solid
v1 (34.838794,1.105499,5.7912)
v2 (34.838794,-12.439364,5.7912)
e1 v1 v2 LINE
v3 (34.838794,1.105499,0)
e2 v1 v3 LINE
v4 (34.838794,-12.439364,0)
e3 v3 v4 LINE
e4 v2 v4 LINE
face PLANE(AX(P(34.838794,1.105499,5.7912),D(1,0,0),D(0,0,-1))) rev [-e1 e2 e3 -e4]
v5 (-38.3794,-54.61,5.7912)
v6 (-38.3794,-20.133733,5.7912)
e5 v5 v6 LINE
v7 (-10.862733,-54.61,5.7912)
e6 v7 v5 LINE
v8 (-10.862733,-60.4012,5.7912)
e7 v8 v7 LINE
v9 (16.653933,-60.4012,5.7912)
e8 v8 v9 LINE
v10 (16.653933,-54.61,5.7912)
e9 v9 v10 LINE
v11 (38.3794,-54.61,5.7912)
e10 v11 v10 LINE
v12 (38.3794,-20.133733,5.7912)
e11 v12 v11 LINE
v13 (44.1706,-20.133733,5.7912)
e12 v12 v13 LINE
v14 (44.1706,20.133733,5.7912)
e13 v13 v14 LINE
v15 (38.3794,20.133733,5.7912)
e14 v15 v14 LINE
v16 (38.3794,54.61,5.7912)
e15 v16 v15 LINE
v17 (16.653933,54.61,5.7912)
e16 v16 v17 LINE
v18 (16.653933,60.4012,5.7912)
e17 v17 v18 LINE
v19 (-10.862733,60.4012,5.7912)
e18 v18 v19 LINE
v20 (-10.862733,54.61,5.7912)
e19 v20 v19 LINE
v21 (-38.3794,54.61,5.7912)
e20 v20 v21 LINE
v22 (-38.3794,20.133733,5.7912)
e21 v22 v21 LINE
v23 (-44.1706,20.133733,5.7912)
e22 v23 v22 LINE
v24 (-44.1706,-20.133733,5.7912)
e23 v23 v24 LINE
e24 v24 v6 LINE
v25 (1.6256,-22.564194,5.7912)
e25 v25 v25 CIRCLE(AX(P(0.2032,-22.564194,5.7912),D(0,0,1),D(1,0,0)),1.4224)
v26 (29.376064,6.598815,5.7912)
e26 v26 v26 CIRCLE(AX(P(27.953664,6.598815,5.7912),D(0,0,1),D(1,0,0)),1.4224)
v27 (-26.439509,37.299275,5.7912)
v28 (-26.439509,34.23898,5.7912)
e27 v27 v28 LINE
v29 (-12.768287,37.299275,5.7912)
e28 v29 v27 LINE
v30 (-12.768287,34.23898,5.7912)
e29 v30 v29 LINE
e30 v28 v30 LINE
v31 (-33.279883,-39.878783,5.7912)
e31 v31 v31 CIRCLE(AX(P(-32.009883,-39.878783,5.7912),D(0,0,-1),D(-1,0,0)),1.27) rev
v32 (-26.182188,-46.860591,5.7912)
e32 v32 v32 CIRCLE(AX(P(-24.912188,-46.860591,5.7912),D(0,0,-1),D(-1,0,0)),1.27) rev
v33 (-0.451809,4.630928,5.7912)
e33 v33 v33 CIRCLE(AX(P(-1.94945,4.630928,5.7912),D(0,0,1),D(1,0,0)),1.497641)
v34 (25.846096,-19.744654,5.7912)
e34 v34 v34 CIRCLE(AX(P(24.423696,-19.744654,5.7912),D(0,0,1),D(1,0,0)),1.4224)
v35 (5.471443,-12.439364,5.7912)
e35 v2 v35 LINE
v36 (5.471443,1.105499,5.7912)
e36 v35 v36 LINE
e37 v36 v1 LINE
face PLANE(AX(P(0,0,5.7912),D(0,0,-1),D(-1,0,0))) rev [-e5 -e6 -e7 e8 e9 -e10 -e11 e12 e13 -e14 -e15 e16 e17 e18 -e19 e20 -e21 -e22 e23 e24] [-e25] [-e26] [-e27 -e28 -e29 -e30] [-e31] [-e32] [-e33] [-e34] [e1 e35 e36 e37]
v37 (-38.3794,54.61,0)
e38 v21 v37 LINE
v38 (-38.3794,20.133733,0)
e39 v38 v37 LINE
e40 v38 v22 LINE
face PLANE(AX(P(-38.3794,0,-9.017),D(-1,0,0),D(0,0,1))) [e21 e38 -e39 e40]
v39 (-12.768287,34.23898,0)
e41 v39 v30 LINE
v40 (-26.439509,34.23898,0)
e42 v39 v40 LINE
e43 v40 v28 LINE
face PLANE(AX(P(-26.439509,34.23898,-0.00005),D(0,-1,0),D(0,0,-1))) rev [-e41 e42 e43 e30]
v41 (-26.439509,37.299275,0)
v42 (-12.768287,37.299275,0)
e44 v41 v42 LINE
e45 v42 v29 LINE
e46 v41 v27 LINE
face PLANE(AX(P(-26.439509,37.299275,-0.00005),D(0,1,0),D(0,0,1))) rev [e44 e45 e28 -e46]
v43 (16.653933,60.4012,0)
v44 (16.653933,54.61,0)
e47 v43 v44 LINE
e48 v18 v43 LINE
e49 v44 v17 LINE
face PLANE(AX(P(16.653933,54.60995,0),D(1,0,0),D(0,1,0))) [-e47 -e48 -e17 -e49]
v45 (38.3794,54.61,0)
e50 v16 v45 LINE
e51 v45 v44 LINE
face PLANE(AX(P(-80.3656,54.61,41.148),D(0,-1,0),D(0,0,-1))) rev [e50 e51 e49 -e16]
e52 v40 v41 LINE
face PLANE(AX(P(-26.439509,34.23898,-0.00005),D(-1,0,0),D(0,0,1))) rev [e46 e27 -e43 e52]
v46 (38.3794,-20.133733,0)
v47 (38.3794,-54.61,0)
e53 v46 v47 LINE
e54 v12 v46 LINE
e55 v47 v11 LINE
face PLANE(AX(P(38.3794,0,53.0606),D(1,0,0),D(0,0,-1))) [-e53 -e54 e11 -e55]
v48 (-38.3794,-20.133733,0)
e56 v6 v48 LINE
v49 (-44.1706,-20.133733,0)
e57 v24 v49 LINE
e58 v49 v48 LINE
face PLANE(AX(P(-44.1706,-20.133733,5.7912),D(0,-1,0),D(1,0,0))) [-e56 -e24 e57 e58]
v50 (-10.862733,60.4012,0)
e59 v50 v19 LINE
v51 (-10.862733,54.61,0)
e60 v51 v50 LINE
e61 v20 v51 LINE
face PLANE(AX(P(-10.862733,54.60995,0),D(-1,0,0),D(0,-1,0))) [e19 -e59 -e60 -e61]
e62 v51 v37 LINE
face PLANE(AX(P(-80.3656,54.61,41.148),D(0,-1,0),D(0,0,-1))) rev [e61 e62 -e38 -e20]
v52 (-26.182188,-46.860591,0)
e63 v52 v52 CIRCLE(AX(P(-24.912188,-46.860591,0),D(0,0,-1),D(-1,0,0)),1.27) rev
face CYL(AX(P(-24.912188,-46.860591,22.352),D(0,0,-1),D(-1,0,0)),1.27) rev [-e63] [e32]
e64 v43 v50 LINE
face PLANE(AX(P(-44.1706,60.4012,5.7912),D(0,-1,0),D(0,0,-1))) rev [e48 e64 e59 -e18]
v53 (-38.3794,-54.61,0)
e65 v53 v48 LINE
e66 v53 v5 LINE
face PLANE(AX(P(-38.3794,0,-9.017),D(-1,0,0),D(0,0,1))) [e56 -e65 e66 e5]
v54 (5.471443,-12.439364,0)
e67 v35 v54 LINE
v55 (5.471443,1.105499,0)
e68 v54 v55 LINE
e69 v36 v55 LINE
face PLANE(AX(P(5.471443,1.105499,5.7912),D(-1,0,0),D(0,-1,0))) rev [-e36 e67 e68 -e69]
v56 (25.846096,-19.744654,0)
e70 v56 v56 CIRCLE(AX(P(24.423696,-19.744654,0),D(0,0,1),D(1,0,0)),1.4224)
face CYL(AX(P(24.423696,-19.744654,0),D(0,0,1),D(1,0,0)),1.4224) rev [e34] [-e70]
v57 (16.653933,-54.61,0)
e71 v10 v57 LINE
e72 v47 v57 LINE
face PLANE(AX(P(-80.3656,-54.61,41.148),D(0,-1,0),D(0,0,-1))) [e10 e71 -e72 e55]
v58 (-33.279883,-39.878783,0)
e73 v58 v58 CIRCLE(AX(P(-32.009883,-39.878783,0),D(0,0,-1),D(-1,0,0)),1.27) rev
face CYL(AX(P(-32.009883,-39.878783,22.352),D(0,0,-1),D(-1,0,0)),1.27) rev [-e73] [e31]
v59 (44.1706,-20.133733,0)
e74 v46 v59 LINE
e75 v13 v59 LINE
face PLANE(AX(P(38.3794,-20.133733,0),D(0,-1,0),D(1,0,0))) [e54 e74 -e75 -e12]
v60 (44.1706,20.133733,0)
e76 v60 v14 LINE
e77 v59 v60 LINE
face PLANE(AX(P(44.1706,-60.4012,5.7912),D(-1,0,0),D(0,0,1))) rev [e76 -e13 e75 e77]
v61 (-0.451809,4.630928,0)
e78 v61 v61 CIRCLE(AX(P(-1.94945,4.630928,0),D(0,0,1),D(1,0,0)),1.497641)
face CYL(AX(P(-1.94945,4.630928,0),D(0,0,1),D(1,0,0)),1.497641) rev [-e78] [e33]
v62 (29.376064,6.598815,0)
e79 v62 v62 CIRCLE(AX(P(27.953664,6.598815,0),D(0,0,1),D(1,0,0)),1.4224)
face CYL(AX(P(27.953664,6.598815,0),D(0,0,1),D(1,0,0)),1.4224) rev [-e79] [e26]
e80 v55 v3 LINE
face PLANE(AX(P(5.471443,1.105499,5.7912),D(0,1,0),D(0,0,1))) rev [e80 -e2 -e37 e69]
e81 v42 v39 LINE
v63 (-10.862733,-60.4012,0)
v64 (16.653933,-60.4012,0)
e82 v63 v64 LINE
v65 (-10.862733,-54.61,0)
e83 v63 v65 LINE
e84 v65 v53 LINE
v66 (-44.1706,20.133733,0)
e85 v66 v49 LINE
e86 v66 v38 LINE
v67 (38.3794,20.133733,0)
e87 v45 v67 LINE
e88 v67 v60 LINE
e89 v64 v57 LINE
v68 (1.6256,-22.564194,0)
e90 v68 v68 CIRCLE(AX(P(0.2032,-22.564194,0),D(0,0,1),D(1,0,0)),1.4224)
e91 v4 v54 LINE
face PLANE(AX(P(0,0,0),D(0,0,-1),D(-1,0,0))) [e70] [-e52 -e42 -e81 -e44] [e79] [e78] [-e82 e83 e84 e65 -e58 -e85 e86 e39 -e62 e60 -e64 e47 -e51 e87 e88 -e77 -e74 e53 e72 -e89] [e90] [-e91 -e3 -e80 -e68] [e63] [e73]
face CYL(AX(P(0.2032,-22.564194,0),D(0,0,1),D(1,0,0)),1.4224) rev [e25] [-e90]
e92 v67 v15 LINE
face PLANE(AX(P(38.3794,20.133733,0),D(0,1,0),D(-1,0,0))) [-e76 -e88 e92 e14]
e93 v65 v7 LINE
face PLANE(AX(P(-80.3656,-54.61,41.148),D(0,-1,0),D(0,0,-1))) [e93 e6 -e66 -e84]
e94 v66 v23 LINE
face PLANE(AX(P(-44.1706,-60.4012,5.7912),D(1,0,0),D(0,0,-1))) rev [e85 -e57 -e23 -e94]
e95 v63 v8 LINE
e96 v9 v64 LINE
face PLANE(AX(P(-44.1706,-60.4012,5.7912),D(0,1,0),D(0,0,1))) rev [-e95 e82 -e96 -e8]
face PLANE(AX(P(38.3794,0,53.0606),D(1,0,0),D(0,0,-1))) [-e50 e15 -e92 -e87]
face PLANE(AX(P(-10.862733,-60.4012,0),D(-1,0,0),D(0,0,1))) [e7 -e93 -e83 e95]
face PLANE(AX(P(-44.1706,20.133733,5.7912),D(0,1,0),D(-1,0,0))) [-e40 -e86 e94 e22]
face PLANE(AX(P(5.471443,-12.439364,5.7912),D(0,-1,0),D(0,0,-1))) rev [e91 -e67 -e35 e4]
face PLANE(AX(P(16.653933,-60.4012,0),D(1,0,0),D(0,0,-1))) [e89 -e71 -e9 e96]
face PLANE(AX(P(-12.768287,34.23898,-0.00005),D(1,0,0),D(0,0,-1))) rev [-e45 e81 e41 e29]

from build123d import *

# Parameters (mm, degrees)
SKETCH1_W                = 88.3412
SKETCH1_H                = 120.8024
BOSS_EXTRUDE1_DEPTH      = 5.7912
SKETCH6_R                = 1.4224
SKETCH6_R_2              = 1.497641053
CUT_EXTRUDE5_DEPTH       = 76.052547347
SKETCH7_W                = 29.367351422
SKETCH7_H                = 13.544863044
CUT_EXTRUDE6_DEPTH       = 76.052547347
CAVITY1_START            = -60.4012
CAVITY1_OUTLINE_W        = 5.7912
CAVITY1_OUTLINE_H        = 5.7912
CAVITY1_DEPTH            = 40.267466667
CAVITY1_START_2          = 20.133733333
CAVITY1_2_OUTLINE_W      = 5.7912
CAVITY1_2_OUTLINE_H      = 5.7912
CAVITY1_2_DEPTH          = 40.267466667
CAVITY1_3_OUTLINE_W      = 21.725466667
CAVITY1_3_OUTLINE_H      = 5.7912
CAVITY1_3_OUTLINE_W_2    = 27.516666667
CAVITY1_3_DEPTH          = 5.7912
CAVITY1_START_3          = 54.61
CAVITY1_4_OUTLINE_W      = 21.725466667
CAVITY1_4_OUTLINE_H      = 5.7912
CAVITY1_4_OUTLINE_W_2    = 27.516666667
CAVITY1_4_DEPTH          = 5.7912
CUT_EXTRUDE13_DEPTH      = 22.352
CUT_EXTRUDE13_DEPTH_BACK = 32.512
SKETCH8_R                = 1.27
SKETCH9_W                = 13.671222204
SKETCH9_H                = 3.060294153
CUT_EXTRUDE14_DEPTH      = 76.052547347


# Read off the part's stored shape, not the designer's step: Cavity1
with BuildPart() as part:
    # Sketch1 → Boss-Extrude1 (new body)
    with BuildSketch(Plane.XY):
        Rectangle(SKETCH1_W, SKETCH1_H)
    extrude(amount=BOSS_EXTRUDE1_DEPTH)

    # Sketch6 → Cut-Extrude5 (cut, through all)
    with BuildSketch(Plane.XY.offset(5.7912)):
        with Locations((0.2032, -22.564194219)):
            Circle(SKETCH6_R)
        with Locations((24.423695828, -19.744653869)):
            Circle(SKETCH6_R)
        with Locations((-1.949450117, 4.630928051)):
            Circle(SKETCH6_R_2)
        with Locations((27.953664088, 6.598815085)):
            Circle(SKETCH6_R)
    extrude(amount=-CUT_EXTRUDE5_DEPTH, mode=Mode.SUBTRACT)

    # Sketch7 → Cut-Extrude6 (cut, through all)
    with BuildSketch(Plane(origin=(0, 0, 0), x_dir=(-1, 0, 0), z_dir=(0, 0, -1))):
        with Locations((-20.155118324, -5.666932702)):
            Rectangle(SKETCH7_W, SKETCH7_H)
    extrude(amount=-CUT_EXTRUDE6_DEPTH, mode=Mode.SUBTRACT)

    # Cavity1 outline → Cavity1 (cut)
    with BuildSketch(Plane(origin=(0, 0, 0), x_dir=(1, 0, 0), z_dir=(0, 1, 0)).offset(CAVITY1_START)):
        with Locations((41.275, -2.8956)):
            Rectangle(CAVITY1_OUTLINE_W, CAVITY1_OUTLINE_H)
        with Locations((-41.275, -2.8956)):
            Rectangle(CAVITY1_OUTLINE_W, CAVITY1_OUTLINE_H)
    extrude(amount=CAVITY1_DEPTH, mode=Mode.SUBTRACT)

    # Cavity1 2 outline → Cavity1 2 (cut)
    with BuildSketch(Plane(origin=(0, 0, 0), x_dir=(1, 0, 0), z_dir=(0, 1, 0)).offset(CAVITY1_START_2)):
        with Locations((41.275, -2.8956)):
            Rectangle(CAVITY1_2_OUTLINE_W, CAVITY1_2_OUTLINE_H)
        with Locations((-41.275, -2.8956)):
            Rectangle(CAVITY1_2_OUTLINE_W, CAVITY1_2_OUTLINE_H)
    extrude(amount=CAVITY1_2_DEPTH, mode=Mode.SUBTRACT)

    # Cavity1 3 outline → Cavity1 3 (cut)
    with BuildSketch(Plane(origin=(0, 0, 0), x_dir=(1, 0, 0), z_dir=(0, 1, 0)).offset(CAVITY1_START)):
        with Locations((27.516666667, -2.8956)):
            Rectangle(CAVITY1_3_OUTLINE_W, CAVITY1_3_OUTLINE_H)
        with Locations((-24.621066667, -2.8956)):
            Rectangle(CAVITY1_3_OUTLINE_W_2, CAVITY1_3_OUTLINE_H)
    extrude(amount=CAVITY1_3_DEPTH, mode=Mode.SUBTRACT)

    # Cavity1 4 outline → Cavity1 4 (cut)
    with BuildSketch(Plane(origin=(0, 0, 0), x_dir=(1, 0, 0), z_dir=(0, 1, 0)).offset(CAVITY1_START_3)):
        with Locations((27.516666667, -2.8956)):
            Rectangle(CAVITY1_4_OUTLINE_W, CAVITY1_4_OUTLINE_H)
        with Locations((-24.621066667, -2.8956)):
            Rectangle(CAVITY1_4_OUTLINE_W_2, CAVITY1_4_OUTLINE_H)
    extrude(amount=CAVITY1_4_DEPTH, mode=Mode.SUBTRACT)

    # Sketch8 → Cut-Extrude13 (cut, two sides: drawn at the far end of the back side and taken through both)
    with BuildSketch(Plane.XY.offset(-CUT_EXTRUDE13_DEPTH_BACK)):
        with Locations(Location((-24.91218753, -46.860591388, 0), (0, 0, 180))):
            Circle(SKETCH8_R)
        with Locations(Location((-32.009882617, -39.878782893, 0), (0, 0, 180))):
            Circle(SKETCH8_R)
    extrude(amount=CUT_EXTRUDE13_DEPTH + CUT_EXTRUDE13_DEPTH_BACK, mode=Mode.SUBTRACT)

    # Sketch9 → Cut-Extrude14 (cut, through all)
    with BuildSketch(Plane.XY.offset(5.7912)):
        with Locations((-19.603898062, 35.76912754)):
            Rectangle(SKETCH9_W, SKETCH9_H)
    extrude(amount=-CUT_EXTRUDE14_DEPTH, mode=Mode.SUBTRACT)


solid = part.part
